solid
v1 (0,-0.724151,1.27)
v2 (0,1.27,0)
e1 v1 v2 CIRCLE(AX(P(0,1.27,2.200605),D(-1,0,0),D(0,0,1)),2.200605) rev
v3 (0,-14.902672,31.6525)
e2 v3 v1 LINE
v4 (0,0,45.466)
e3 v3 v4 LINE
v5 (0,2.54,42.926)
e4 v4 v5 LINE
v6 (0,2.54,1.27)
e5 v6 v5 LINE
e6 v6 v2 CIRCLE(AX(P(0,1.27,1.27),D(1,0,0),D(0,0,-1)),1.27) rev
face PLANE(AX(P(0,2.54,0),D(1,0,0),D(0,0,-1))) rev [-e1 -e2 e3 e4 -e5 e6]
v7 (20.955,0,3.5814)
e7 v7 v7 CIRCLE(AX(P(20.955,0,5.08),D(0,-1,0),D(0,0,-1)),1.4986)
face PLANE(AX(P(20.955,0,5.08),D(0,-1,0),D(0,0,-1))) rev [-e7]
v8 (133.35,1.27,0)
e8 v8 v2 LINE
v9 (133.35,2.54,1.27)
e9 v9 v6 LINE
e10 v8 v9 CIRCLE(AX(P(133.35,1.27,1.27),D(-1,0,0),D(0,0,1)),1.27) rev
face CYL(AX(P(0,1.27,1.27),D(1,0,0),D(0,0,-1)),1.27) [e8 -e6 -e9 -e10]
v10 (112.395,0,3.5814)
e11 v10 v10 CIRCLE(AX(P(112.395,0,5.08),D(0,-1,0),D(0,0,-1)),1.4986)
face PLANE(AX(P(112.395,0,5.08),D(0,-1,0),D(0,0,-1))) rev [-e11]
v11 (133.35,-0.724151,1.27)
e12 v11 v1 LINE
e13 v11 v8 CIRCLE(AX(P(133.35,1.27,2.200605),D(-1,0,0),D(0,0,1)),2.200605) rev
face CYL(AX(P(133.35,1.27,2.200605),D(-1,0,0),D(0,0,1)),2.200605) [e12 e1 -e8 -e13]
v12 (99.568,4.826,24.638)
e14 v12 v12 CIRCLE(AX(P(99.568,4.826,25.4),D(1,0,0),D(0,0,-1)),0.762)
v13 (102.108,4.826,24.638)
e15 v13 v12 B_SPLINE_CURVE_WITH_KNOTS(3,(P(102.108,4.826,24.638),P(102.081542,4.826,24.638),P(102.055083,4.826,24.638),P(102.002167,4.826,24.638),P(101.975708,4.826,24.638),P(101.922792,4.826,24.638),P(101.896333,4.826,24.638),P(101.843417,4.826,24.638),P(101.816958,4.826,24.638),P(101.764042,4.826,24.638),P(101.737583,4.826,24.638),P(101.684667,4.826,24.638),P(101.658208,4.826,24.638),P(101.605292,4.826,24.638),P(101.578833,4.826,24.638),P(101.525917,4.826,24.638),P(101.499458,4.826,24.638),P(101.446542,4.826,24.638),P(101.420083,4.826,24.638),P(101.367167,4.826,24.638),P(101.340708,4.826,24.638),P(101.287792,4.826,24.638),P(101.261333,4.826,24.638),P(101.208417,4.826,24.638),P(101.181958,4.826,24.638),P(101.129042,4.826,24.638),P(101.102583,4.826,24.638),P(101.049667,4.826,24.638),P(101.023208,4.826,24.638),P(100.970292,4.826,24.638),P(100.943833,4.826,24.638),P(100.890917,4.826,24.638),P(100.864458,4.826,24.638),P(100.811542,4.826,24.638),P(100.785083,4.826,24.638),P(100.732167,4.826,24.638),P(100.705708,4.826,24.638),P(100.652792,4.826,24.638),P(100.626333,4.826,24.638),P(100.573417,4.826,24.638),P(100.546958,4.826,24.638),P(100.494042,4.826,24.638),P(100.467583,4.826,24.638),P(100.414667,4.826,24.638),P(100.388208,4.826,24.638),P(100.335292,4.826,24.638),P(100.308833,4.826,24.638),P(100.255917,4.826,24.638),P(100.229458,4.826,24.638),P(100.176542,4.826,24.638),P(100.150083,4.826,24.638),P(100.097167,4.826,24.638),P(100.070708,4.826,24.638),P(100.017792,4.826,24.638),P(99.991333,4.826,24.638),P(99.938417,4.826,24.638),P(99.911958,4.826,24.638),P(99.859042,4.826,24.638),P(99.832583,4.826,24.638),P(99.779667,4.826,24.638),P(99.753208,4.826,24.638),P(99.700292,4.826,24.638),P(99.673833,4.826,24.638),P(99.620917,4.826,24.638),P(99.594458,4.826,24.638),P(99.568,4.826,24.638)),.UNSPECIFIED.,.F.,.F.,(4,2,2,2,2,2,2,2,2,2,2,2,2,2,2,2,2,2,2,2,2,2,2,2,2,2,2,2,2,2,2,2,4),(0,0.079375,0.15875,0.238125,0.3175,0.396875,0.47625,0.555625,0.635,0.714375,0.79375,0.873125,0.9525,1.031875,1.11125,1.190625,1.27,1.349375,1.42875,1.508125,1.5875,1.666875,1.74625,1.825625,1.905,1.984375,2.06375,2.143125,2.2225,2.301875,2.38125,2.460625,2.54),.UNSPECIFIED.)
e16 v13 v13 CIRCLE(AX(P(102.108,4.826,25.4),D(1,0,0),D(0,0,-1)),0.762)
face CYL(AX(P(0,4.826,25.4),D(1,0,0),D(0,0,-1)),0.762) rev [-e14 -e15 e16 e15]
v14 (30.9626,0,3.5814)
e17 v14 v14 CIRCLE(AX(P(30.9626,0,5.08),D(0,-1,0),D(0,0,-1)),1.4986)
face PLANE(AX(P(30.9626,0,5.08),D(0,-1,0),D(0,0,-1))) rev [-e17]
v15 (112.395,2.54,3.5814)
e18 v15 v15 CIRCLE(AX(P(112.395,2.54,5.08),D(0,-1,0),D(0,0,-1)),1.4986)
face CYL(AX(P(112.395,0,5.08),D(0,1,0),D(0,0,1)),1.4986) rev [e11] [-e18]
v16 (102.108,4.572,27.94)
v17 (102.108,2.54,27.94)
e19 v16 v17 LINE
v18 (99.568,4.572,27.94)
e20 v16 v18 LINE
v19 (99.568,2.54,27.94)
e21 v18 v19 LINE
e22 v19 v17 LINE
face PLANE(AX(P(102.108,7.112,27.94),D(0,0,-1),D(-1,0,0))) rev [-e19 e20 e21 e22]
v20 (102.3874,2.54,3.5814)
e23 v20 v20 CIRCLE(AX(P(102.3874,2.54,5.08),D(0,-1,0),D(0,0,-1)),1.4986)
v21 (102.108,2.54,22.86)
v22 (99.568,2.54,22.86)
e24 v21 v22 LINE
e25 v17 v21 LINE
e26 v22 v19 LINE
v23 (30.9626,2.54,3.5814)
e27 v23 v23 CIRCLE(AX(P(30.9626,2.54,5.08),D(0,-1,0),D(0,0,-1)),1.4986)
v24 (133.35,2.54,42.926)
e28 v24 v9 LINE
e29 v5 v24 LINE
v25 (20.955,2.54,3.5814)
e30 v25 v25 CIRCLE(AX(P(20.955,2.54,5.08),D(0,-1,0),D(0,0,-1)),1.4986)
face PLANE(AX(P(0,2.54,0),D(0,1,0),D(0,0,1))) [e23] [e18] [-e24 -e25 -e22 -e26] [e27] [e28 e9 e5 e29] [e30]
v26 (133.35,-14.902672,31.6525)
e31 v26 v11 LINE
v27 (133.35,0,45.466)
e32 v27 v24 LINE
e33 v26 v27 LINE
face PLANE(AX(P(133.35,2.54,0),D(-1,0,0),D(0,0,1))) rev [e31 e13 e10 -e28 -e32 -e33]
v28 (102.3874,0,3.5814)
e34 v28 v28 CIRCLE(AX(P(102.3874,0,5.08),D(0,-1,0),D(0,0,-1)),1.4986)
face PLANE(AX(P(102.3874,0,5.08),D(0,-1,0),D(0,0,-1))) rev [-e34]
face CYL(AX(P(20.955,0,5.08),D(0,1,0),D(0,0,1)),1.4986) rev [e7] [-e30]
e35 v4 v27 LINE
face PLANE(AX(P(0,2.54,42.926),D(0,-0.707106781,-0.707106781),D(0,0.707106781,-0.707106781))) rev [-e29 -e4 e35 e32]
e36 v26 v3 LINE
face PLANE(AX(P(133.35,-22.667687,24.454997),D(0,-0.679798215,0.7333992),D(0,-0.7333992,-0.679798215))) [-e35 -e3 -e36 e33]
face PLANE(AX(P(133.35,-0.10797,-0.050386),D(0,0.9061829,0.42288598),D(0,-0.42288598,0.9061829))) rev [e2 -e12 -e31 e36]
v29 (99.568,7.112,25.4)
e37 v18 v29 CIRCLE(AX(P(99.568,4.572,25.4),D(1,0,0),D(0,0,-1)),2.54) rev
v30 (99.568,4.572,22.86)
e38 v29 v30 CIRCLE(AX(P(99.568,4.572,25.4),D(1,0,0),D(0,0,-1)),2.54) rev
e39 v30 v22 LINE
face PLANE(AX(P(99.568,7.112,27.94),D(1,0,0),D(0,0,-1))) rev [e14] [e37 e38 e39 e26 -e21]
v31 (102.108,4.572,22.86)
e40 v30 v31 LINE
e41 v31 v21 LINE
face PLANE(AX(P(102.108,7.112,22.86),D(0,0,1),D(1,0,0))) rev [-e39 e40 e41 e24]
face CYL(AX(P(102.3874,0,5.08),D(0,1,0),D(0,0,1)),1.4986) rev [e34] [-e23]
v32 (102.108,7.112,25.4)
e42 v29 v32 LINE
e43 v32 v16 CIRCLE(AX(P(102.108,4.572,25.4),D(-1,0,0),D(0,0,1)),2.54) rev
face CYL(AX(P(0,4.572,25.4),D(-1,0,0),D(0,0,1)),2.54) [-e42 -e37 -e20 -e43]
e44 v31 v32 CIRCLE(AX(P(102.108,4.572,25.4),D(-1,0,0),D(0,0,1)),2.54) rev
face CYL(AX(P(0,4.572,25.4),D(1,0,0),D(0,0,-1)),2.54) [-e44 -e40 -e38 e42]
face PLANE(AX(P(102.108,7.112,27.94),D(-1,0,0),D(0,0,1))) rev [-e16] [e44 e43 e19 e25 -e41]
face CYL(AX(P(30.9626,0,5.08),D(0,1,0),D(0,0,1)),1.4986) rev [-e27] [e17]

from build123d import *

# Parameters (mm, degrees)
SKETCH1_W           = 133.35
SKETCH1_H           = 45.466
BOSS_EXTRUDE1_DEPTH = 2.54
CUT_EXTRUDE1_DEPTH  = 141.91072087
SKETCH4_W           = 2.54
SKETCH4_H           = 5.08
BOSS_EXTRUDE2_DEPTH = 4.572
SKETCH5_R           = 0.762
CUT_EXTRUDE2_DEPTH  = 112.999023942
FILLET1_R           = 2.54
FILLET2_R           = 2.54
FILLET3_R           = 1.27
BOSS_EXTRUDE4_DEPTH = 133.35
SKETCH10_R          = 1.4986
CUT_EXTRUDE3_DEPTH  = 2.54


with BuildPart() as part:
    # Sketch1 → Boss-Extrude1 (new body)
    with BuildSketch(Plane(origin=(0, 0, 0), x_dir=(1, 0, 0), z_dir=(0, 1, 0))):
        with Locations((66.675, -22.733)):
            Rectangle(SKETCH1_W, SKETCH1_H)
    extrude(amount=BOSS_EXTRUDE1_DEPTH)

    # Sketch2 → Cut-Extrude1 (cut, through all)
    with BuildSketch(Plane(origin=(133.35, 0, 0), x_dir=(0, 0, -1), z_dir=(1, 0, 0))):
        Polygon((-45.466, 0), (-45.466, 2.54), (-42.926, 2.54), align=None)
    extrude(amount=-CUT_EXTRUDE1_DEPTH, mode=Mode.SUBTRACT)

    # Sketch4 → Boss-Extrude2 (add)
    with BuildSketch(Plane(origin=(0, 2.54, 0), x_dir=(1, 0, 0), z_dir=(0, 1, 0))):
        with Locations((100.838, -25.4)):
            Rectangle(SKETCH4_W, SKETCH4_H)
    extrude(amount=BOSS_EXTRUDE2_DEPTH)

    # Sketch5 → Cut-Extrude2 (cut, through all)
    with BuildSketch(Plane(origin=(102.108, 0, 0), x_dir=(0, 0, -1), z_dir=(1, 0, 0))):
        with Locations((-25.4, 4.826)):
            Circle(SKETCH5_R)
    extrude(amount=-CUT_EXTRUDE2_DEPTH, mode=Mode.SUBTRACT)

    # Fillet1
    fillet1_edges = [part.edges().sort_by_distance(p)[0] for p in [
        (100.838, 7.112, 27.94),
    ]]
    fillet(fillet1_edges, radius=FILLET1_R)

    # Fillet2
    fillet2_edges = [part.edges().sort_by_distance(p)[0] for p in [
        (100.838, 7.112, 22.86),
    ]]
    fillet(fillet2_edges, radius=FILLET2_R - 0.0001)  # a hair under: the kernel refuses the full size

    # Fillet3
    fillet3_edges = [part.edges().sort_by_distance(p)[0] for p in [
        (66.675, 0, 0),
        (66.675, 2.54, 0),
    ]]
    fillet(fillet3_edges, radius=FILLET3_R - 0.0001)  # a hair under: the kernel refuses the full size

    # Sketch8 → Boss-Extrude4 (add)
    with BuildSketch(Plane.ZY):
        Polygon((1.27, -0.724150623), (31.652500271, -14.902671748), (45.466, 0), (1.27, 0), align=None)
        with BuildLine():
            ThreePointArc((0, 1.27), (0.344458941, 0.087889947), (1.27, -0.724150623))
            Line((1.27, -0.724150623), (1.27, 0))
            ThreePointArc((1.27, 0), (0.371974388, 0.371974388), (0, 1.27))
        make_face()
    extrude(amount=-BOSS_EXTRUDE4_DEPTH)

    # Sketch10 → Cut-Extrude3 (cut)
    with BuildSketch(Plane(origin=(0, 2.54, 0.507603591), x_dir=(1, 0, 0), z_dir=(0, -1, 0))):
        with Locations(Location((20.955, 4.572396409, 0), (0, 0, 270))):
            Circle(SKETCH10_R)
        with Locations(Location((30.9626, 4.572396409, 0), (0, 0, 270))):
            Circle(SKETCH10_R)
        with Locations(Location((102.3874, 4.572396409, 0), (0, 0, 270))):
            Circle(SKETCH10_R)
        with Locations(Location((112.395, 4.572396409, 0), (0, 0, 270))):
            Circle(SKETCH10_R)
    extrude(amount=CUT_EXTRUDE3_DEPTH, mode=Mode.SUBTRACT)


solid = part.part
